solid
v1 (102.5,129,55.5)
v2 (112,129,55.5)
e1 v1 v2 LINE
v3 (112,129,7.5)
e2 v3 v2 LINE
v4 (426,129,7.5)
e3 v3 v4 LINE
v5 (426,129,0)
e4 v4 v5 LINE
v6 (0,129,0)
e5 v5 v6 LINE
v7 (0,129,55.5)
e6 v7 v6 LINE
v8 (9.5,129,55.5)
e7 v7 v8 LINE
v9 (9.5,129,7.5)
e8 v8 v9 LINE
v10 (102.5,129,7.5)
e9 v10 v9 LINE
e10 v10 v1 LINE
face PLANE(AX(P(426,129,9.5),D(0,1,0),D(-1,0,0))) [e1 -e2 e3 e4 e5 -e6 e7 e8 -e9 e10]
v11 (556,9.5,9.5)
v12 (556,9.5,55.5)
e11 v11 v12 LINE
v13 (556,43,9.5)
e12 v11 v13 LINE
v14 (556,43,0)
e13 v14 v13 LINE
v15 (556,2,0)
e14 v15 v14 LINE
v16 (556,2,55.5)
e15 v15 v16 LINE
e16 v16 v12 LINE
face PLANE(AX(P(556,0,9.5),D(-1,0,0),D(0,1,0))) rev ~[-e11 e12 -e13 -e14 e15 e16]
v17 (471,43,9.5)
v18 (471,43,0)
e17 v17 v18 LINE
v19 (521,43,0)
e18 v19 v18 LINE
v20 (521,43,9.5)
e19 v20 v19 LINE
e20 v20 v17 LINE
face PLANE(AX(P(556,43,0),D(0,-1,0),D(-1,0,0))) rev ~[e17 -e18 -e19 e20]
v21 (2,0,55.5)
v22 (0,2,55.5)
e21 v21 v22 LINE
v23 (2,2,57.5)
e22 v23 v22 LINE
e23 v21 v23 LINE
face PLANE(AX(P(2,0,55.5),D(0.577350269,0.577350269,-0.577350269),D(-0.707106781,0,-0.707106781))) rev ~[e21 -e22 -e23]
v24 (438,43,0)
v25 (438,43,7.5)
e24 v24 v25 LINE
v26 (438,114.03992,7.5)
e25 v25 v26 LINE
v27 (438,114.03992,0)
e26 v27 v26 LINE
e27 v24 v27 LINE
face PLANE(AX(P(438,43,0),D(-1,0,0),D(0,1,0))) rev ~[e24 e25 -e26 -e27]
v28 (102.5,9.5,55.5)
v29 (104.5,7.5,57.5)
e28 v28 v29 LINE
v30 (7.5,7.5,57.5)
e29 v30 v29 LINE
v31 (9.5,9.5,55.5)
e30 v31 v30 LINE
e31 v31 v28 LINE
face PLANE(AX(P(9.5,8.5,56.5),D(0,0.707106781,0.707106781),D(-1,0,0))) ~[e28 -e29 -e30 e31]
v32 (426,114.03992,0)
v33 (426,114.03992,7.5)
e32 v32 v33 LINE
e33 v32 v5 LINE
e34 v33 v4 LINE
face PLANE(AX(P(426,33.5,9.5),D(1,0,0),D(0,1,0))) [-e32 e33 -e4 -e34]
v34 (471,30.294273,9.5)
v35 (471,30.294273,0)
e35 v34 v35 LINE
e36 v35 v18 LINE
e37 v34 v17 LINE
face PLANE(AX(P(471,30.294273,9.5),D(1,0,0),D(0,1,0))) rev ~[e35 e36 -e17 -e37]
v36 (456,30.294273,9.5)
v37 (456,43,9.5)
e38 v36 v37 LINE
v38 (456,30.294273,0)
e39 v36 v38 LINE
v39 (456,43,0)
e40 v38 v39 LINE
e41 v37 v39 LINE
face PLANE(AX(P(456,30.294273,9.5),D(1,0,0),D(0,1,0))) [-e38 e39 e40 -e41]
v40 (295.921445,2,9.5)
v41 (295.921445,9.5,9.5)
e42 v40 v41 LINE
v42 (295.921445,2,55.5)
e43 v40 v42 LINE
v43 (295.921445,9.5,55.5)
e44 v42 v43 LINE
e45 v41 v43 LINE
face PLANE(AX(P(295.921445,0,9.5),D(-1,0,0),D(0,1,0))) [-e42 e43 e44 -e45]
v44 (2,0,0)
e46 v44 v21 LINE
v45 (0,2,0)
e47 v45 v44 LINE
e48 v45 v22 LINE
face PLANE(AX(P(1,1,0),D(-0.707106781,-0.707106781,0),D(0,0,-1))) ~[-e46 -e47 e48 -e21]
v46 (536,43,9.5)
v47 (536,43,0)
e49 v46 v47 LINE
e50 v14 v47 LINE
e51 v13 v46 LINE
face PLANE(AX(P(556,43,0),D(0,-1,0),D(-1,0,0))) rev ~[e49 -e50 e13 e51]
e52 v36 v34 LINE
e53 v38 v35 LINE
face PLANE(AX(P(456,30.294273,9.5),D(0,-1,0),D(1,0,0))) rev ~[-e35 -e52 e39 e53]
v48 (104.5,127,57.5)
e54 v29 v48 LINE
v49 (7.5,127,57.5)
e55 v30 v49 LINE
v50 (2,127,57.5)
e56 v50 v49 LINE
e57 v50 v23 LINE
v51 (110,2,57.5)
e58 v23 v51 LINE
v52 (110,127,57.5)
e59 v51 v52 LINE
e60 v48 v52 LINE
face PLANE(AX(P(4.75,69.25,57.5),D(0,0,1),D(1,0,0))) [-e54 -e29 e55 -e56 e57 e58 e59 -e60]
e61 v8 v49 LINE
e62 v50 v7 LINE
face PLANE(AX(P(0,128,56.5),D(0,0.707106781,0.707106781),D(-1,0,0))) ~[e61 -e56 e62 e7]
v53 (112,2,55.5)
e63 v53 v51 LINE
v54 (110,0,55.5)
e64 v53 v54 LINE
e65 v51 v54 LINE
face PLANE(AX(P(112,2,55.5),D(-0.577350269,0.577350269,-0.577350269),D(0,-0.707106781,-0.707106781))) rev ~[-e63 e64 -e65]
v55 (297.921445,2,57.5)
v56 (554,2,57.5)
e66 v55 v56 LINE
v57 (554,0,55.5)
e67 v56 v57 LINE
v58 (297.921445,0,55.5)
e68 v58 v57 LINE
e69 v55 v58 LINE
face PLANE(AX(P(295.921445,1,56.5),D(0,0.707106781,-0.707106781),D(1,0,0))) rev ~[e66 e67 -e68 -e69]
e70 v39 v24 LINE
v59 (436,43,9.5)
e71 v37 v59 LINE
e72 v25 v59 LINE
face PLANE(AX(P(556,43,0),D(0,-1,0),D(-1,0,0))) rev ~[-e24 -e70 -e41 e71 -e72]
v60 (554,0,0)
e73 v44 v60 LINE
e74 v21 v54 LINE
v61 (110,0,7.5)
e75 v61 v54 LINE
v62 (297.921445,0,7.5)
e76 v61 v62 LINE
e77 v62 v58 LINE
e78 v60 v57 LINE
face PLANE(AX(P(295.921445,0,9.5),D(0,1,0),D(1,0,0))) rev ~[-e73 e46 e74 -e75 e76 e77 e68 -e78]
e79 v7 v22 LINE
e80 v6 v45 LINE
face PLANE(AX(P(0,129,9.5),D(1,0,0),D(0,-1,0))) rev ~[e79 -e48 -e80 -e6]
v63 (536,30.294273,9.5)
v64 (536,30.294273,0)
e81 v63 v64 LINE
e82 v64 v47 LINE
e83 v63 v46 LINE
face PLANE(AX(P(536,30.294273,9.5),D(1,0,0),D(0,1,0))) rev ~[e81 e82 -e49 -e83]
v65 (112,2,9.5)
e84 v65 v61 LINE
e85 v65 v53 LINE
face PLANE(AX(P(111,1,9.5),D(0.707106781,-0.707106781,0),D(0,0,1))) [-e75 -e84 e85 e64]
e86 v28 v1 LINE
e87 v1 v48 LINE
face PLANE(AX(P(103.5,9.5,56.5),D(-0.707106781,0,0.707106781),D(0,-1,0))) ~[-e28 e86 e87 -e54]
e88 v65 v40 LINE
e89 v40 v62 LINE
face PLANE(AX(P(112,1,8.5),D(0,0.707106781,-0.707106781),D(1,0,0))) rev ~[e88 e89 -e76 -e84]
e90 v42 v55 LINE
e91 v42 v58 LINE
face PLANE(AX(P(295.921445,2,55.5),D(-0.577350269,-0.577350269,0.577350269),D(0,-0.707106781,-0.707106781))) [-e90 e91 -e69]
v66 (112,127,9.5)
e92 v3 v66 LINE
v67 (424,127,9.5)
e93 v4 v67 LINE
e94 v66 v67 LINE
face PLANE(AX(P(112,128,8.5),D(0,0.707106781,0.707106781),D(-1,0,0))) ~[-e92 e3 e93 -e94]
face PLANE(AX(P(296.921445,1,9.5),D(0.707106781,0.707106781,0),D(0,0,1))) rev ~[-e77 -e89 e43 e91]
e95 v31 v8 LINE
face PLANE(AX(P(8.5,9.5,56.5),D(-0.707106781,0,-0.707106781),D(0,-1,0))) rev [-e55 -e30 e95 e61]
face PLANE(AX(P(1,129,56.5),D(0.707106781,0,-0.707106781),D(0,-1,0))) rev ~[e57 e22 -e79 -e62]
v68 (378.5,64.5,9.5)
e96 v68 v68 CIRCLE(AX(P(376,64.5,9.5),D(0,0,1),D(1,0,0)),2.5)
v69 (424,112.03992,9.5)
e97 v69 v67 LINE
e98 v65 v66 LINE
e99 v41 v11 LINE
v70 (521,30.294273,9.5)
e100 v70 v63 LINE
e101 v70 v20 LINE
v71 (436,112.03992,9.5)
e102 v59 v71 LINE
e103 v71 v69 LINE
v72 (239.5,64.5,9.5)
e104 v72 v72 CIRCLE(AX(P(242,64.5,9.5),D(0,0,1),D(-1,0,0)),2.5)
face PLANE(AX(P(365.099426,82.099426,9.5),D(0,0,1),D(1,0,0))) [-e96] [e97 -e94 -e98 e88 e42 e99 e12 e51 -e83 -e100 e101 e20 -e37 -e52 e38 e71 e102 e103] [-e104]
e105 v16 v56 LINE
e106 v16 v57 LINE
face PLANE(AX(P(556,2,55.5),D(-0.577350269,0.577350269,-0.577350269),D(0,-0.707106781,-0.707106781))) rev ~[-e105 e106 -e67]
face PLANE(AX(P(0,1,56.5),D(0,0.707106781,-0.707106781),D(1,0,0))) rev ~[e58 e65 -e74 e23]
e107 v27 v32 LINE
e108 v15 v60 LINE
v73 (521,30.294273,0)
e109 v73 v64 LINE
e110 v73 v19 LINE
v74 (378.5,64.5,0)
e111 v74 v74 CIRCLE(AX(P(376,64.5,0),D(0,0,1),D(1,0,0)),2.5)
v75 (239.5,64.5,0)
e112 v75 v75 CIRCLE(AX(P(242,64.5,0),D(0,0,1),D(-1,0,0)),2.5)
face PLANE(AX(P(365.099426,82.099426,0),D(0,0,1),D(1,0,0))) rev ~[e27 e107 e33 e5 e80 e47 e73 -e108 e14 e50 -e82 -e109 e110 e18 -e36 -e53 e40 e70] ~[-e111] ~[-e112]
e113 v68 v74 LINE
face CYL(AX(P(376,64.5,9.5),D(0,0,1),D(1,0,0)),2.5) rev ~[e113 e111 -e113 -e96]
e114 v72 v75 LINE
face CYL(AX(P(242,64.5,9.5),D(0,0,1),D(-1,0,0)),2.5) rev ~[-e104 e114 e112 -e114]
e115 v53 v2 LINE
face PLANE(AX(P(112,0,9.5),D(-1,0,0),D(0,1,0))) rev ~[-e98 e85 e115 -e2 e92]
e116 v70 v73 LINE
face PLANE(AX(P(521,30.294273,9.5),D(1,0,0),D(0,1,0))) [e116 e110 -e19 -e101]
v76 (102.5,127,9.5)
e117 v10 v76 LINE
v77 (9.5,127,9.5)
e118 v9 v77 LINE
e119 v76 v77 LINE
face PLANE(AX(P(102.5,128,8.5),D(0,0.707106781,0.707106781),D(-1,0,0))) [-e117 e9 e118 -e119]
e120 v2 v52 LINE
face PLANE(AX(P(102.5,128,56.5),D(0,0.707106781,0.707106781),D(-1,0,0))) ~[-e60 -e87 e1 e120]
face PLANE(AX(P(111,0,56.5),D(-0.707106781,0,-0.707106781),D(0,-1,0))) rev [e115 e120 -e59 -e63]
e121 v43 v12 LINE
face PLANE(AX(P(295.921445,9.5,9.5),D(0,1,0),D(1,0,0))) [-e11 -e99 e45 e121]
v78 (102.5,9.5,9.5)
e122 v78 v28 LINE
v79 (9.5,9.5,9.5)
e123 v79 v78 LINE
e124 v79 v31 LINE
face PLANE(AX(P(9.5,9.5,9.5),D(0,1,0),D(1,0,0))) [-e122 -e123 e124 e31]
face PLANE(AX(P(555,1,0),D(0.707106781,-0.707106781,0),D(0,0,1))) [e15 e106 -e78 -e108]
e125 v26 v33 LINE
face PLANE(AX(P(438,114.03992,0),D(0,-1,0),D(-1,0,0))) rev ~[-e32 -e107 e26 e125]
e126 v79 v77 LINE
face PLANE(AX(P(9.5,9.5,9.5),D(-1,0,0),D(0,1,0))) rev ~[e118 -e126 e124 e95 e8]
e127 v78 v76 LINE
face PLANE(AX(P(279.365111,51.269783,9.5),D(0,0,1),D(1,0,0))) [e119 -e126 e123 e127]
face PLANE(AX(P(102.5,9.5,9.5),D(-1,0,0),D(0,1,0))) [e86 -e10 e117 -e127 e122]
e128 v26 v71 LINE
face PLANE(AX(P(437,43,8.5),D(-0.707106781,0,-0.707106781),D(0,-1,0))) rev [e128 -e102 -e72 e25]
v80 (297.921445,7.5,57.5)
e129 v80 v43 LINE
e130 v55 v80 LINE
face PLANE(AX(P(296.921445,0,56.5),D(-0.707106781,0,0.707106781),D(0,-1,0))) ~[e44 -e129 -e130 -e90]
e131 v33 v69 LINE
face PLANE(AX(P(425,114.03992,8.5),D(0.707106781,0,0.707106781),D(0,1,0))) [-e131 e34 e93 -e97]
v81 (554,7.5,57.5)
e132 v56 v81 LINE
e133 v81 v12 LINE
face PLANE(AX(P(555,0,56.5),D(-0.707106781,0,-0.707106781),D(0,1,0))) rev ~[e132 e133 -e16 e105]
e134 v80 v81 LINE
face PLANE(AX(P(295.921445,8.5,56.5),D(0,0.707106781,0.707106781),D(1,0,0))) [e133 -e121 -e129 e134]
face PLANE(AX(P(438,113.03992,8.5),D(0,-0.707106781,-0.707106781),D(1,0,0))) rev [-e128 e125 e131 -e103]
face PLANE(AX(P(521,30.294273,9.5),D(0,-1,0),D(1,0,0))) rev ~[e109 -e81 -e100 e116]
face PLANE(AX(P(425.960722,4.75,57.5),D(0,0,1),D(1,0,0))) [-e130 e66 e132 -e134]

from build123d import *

# Parameters (mm, degrees)
F1_DEPTH  = 9.5
F2_W      = 9.5
F2_H      = 119.5
F2_H_2    = 9.5
F2_W_2    = 93
F3_DEPTH  = 48
F5_DEPTH  = 9.5
F6_R      = 2.5
F7_DEPTH  = 25.4
F8_W      = 15
F8_H      = 12.7057269514
F9_DEPTH  = 9.501
F10_W     = 260.0785551071
F10_H     = 9.5
F11_DEPTH = 48
F12_SIZE  = 2


# Not quite as in the source:
# - a feature names something its author has since deleted; it is built from what else it names


with BuildPart() as f1:
    # F0 (on Top) → F1 (new body)
    with BuildSketch(Plane.XY):
        Polygon((0, 129), (0, 0), (556, 0), (556, 43), (438, 43), (438, 114.0399202704), (426, 114.0399202704), (426, 33.5), (310, 33.5), (310, 83.1064879894), (302.5, 83.1064879894), (302.5, 129), align=None)
    extrude(amount=F1_DEPTH)

    # F2 (on face) → F3 (join)
    with BuildSketch(Plane.XY.offset(9.5)):
        with Locations((4.75, 69.25)):
            Rectangle(F2_W, F2_H)
        with Locations((4.75, 4.75)):
            Rectangle(F2_W, F2_H_2)
        with Locations((56, 4.75)):
            Rectangle(F2_W_2, F2_H_2)
        with Locations((107.25, 69.25)):
            Rectangle(F2_W, F2_H)
        with Locations((107.25, 4.75)):
            Rectangle(F2_W, F2_H_2)
    extrude(amount=F3_DEPTH)

    # F4 (on face) → F5 (join)
    with BuildSketch(Plane.XY.offset(9.5)):
        Polygon((426, 129), (302.5, 129), (302.5, 83.1064879894), (310, 83.1064879894), (310, 33.5), (426, 33.5), align=None)
    extrude(amount=-F5_DEPTH)

    # F6 (on face) → F7 (cut)
    with BuildSketch(Plane.XY.offset(9.5)):
        with BuildLine():
            ThreePointArc((244.5, 64.5), (242, 67), (239.5, 64.5))
            Line((239.5, 64.5), (244.5, 64.5))
        make_face()
        with BuildLine():
            Line((244.5, 64.5), (239.5, 64.5))
            ThreePointArc((239.5, 64.5), (242, 62), (244.5, 64.5))
        make_face()
        with Locations((376, 64.5)):
            Circle(F6_R)
    extrude(amount=-F7_DEPTH, mode=Mode.SUBTRACT)

    # F8 (on face) → F9 (cut, through all)
    with BuildSketch(Plane.XY.offset(9.5)):
        with Locations((463.5, 36.6471365243)):
            Rectangle(F8_W, F8_H)
        with Locations((528.5, 36.6471365243)):
            Rectangle(F8_W, F8_H)
    extrude(amount=-F9_DEPTH, mode=Mode.SUBTRACT)

    # F10 (on face) → F11 (join)
    with BuildSketch(Plane.XY.offset(9.5)):
        with Locations((425.9607224464, 4.75)):
            Rectangle(F10_W, F10_H)
    extrude(amount=F11_DEPTH)

    # F12
    f12_edges = [f1.edges().sort_by_distance(p)[0] for p in [
        (0, 64.5, 57.5),
        (9.5, 69.25, 57.5),
        (56, 0, 57.5),
        (56, 9.5, 57.5),
        (102.5, 69.25, 57.5),
        (112, 64.5, 57.5),
        (107.25, 129, 57.5),
        (4.75, 129, 57.5),
        (56, 129, 9.5),
        (269, 129, 9.5),
        (203.960722, 0, 9.5),
        (425.960722, 0, 57.5),
        (425.960722, 9.5, 57.5),
        (556, 4.75, 57.5),
        (438, 78.51996, 9.5),
        (426, 121.51996, 9.5),
        (432, 114.03992, 9.5),
        (112, 0, 33.5),
        (0, 0, 28.75),
        (295.921445, 4.75, 57.5),
        (295.921445, 0, 33.5),
        (556, 0, 28.75),
    ]]
    chamfer(f12_edges, length=F12_SIZE)


solid = f1.part
